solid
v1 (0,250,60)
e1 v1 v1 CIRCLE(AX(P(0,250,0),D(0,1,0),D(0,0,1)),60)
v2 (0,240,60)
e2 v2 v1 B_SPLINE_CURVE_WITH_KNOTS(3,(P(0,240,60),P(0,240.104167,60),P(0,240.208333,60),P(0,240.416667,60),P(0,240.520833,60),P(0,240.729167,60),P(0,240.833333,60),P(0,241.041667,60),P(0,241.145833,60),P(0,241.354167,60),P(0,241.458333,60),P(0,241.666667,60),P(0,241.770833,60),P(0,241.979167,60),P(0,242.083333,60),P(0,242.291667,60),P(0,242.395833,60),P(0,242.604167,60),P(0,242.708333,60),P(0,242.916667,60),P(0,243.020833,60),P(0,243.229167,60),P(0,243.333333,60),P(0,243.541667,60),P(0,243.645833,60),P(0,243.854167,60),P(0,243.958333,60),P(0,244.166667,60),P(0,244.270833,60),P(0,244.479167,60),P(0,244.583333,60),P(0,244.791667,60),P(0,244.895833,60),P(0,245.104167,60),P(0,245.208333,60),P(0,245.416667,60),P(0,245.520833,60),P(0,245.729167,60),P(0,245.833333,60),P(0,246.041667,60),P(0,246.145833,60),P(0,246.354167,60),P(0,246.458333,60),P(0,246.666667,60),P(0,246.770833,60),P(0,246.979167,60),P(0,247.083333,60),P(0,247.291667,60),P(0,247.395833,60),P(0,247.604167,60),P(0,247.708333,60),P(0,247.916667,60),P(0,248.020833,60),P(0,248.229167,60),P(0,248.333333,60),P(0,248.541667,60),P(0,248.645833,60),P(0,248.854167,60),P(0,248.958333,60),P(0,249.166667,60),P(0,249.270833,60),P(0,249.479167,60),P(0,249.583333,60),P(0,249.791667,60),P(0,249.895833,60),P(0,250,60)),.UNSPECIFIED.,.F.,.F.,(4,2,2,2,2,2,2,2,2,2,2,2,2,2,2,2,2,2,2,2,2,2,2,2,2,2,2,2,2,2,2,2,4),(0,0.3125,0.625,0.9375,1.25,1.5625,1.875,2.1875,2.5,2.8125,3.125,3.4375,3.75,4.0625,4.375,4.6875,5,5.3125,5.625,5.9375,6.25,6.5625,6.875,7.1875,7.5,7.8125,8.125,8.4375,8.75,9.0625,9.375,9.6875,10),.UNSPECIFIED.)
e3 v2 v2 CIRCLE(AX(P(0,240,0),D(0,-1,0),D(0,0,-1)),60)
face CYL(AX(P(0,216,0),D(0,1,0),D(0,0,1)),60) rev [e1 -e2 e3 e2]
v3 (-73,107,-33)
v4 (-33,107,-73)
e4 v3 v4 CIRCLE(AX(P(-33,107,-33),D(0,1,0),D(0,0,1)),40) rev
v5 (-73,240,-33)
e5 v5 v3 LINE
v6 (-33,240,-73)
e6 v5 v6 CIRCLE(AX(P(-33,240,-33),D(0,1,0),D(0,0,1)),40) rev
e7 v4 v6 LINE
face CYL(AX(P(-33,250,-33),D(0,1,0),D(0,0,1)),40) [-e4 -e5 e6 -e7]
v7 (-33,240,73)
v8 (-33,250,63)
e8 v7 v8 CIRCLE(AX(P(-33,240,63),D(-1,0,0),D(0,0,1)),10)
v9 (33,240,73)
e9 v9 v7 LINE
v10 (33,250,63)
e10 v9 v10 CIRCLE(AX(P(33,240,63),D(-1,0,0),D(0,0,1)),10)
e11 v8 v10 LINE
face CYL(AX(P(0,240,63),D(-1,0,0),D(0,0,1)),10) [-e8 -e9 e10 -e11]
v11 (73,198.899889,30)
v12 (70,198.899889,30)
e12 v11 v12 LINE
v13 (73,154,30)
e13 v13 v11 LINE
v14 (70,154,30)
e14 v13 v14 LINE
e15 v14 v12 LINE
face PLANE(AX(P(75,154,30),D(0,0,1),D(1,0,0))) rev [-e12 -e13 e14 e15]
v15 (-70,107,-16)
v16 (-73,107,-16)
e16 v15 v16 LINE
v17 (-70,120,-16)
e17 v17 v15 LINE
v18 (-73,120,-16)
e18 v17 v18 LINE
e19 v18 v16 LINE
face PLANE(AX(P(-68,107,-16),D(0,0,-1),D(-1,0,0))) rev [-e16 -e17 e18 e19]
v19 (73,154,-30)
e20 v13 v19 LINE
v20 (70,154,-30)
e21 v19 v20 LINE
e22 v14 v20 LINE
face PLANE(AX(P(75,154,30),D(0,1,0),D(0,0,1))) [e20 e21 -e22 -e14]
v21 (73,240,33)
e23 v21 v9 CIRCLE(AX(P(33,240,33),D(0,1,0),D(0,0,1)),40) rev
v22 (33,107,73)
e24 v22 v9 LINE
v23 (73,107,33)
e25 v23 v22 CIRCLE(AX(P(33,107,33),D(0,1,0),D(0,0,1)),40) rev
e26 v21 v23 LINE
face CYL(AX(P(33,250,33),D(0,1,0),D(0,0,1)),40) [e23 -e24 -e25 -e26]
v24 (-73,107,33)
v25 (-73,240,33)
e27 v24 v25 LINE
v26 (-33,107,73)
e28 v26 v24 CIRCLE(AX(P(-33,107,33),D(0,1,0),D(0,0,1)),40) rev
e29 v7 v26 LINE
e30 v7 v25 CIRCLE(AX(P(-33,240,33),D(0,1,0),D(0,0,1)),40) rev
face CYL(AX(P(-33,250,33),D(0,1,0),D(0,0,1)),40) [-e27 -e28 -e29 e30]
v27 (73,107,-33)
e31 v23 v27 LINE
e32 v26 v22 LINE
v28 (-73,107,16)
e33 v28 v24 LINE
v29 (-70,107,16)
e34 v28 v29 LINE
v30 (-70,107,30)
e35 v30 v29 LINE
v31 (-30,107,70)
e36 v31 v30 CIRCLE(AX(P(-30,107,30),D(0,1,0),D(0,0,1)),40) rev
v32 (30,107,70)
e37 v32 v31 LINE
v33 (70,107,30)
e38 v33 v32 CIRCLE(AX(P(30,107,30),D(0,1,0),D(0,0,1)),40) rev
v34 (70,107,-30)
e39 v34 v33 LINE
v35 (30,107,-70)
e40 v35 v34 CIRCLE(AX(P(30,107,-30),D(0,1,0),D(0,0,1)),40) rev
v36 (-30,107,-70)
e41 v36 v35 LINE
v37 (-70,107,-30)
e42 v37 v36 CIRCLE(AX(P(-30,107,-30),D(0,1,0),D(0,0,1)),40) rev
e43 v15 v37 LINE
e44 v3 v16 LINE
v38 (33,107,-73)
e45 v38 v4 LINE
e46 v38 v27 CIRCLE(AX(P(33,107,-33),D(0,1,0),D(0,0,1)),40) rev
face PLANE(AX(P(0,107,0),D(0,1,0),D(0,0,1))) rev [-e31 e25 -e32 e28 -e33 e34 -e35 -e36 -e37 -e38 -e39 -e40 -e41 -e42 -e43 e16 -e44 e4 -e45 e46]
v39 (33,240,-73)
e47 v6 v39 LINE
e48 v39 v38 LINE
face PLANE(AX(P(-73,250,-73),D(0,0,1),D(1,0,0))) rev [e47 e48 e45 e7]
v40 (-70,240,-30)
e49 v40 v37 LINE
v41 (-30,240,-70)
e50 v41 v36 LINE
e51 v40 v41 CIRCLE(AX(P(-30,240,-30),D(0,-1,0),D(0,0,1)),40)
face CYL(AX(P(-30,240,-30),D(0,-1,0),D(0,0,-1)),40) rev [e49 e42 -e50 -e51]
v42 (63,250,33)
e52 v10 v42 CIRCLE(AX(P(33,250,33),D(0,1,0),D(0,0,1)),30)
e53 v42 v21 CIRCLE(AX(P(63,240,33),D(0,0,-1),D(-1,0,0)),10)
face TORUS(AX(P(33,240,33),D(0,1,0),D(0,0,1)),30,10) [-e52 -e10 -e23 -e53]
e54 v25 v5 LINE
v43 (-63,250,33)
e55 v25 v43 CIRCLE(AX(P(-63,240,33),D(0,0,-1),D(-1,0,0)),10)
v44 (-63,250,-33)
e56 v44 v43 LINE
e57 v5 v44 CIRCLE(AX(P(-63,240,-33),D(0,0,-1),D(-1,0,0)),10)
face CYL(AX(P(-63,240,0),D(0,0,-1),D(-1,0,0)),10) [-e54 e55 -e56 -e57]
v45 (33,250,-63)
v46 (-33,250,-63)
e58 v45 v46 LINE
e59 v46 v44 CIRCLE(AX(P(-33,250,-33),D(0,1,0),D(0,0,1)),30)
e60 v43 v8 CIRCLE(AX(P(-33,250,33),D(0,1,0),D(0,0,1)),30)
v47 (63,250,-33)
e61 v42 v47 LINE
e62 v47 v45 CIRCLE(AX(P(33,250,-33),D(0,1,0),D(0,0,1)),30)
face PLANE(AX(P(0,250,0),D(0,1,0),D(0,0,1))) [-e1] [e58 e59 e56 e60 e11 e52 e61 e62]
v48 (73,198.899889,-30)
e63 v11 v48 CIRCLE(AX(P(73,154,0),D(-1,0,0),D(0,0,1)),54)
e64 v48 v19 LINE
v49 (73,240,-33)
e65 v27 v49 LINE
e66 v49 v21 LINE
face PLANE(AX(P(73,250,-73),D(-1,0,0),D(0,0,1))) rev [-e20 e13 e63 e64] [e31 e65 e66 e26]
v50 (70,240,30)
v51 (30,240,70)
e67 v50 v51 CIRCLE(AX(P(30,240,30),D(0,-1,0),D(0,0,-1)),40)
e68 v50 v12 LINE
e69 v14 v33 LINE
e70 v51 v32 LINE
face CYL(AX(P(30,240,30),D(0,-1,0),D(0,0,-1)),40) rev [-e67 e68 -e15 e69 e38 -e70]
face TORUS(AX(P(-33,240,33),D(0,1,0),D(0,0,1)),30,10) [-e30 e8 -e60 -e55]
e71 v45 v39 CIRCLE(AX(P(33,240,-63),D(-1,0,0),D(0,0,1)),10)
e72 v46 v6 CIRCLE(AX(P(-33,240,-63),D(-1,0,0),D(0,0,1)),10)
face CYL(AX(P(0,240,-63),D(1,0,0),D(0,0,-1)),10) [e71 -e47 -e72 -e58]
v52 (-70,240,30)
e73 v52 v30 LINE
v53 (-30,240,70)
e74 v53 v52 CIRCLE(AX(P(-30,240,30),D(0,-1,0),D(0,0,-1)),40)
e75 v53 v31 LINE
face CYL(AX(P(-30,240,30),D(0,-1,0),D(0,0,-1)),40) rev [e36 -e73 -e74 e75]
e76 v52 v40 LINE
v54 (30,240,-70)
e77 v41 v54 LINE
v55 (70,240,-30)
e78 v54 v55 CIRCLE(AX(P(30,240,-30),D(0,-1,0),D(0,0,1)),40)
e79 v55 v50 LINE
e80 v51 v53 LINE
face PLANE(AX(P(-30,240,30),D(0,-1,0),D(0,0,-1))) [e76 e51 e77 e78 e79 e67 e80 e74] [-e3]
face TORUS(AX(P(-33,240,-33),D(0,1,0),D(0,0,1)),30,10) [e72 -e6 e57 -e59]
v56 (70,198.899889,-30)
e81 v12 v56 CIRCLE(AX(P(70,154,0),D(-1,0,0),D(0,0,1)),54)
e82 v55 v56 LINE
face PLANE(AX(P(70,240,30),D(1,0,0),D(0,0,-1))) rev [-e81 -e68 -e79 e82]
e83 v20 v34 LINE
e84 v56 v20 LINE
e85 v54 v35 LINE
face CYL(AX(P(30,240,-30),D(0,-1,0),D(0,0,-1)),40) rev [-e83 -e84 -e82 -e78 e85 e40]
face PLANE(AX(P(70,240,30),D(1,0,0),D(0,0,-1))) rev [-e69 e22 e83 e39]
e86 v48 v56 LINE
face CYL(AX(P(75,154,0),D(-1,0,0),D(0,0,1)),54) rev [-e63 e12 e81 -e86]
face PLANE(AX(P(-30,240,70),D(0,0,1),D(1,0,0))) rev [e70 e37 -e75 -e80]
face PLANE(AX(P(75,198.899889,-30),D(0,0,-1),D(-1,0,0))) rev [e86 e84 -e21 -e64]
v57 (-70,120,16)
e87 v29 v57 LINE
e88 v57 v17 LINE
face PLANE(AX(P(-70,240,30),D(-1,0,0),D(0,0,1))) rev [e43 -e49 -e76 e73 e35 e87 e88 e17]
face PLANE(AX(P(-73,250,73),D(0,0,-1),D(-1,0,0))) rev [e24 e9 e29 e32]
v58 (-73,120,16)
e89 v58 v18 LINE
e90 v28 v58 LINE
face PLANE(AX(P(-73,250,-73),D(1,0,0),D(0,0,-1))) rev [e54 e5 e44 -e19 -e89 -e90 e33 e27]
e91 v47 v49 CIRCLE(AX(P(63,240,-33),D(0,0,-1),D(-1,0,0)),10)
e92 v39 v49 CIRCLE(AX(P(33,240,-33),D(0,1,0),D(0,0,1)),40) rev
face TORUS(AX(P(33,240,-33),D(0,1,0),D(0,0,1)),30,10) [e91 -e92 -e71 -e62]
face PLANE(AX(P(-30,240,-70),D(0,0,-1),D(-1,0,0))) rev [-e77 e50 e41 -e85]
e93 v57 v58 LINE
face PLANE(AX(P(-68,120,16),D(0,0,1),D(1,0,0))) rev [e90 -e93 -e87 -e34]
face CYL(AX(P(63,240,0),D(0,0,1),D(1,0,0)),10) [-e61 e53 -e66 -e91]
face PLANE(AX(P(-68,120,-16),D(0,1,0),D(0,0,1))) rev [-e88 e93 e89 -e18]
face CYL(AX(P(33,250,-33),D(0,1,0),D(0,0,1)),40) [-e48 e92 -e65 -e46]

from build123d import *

# Parameters (mm, degrees)
SKETCH5_W           = 146
SKETCH5_H           = 146
BOSS_EXTRUDE2_DEPTH = 250
FILLET8_R           = 40
FILLET9_R           = 40
FILLET10_R          = 40
FILLET11_R          = 40
FILLET12_R          = 10
BOSS_EXTRUDE5_START = -240
BOSS_EXTRUDE5_DEPTH = 240
SKETCH8_R           = 60
CUT_EXTRUDE1_DEPTH  = 34
SKETCH10_W          = 44
SKETCH10_H          = 33
CUT_EXTRUDE2_DEPTH  = 3
CUT_EXTRUDE3_DEPTH  = 3
SKETCH12_W          = 157.188162186
SKETCH12_H          = 158.114359626
CUT_EXTRUDE4_DEPTH  = 107
SKETCH15_W          = 32
SKETCH15_H          = 13
CUT_EXTRUDE7_DEPTH  = 5
CUT_EXTRUDE9_DEPTH  = 5


# Read off the part's stored shape, not the designer's step: Boss-Extrude5
with BuildPart() as part:
    # Sketch5 → Boss-Extrude2 (new body)
    with BuildSketch(Plane(origin=(0, 0, 0), x_dir=(1, 0, 0), z_dir=(0, 1, 0))):
        Rectangle(SKETCH5_W, SKETCH5_H)
    extrude(amount=BOSS_EXTRUDE2_DEPTH)

    # Fillet8
    fillet8_edges = [part.edges().sort_by_distance(p)[0] for p in [
        (73, 125, 73),
    ]]
    fillet(fillet8_edges, radius=FILLET8_R)

    # Fillet9
    fillet9_edges = [part.edges().sort_by_distance(p)[0] for p in [
        (73, 125, -73),
    ]]
    fillet(fillet9_edges, radius=FILLET9_R)

    # Fillet10
    fillet10_edges = [part.edges().sort_by_distance(p)[0] for p in [
        (-73, 125, -73),
    ]]
    fillet(fillet10_edges, radius=FILLET10_R)

    # Fillet11
    fillet11_edges = [part.edges().sort_by_distance(p)[0] for p in [
        (-73, 125, 73),
    ]]
    fillet(fillet11_edges, radius=FILLET11_R)

    # Fillet12
    fillet12_edges = [part.edges().sort_by_distance(p)[0] for p in [
        (73, 250, 0),
        (61.284271247, 250, 61.284271247),
        (0, 250, -73),
        (61.284271247, 250, -61.284271247),
        (-73, 250, 0),
        (-61.284271247, 250, -61.284271247),
        (0, 250, 73),
        (-61.284271247, 250, 61.284271247),
    ]]
    fillet(fillet12_edges, radius=FILLET12_R)

    # Boss-Extrude5 outline → Boss-Extrude5 (cut)
    with BuildSketch(Plane.XZ.offset(BOSS_EXTRUDE5_START)):
        with BuildLine():
            Line((30, 70), (-30, 70))
            ThreePointArc((-30, 70), (-58.284271247, 58.284271247), (-70, 30))
            Line((-70, 30), (-70, -30))
            ThreePointArc((-70, -30), (-58.284271247, -58.284271247), (-30, -70))
            Line((-30, -70), (30, -70))
            ThreePointArc((30, -70), (58.284271247, -58.284271247), (70, -30))
            Line((70, -30), (70, 30))
            ThreePointArc((70, 30), (58.284271247, 58.284271247), (30, 70))
        make_face()
    extrude(amount=BOSS_EXTRUDE5_DEPTH, mode=Mode.SUBTRACT)

    # Sketch8 → Cut-Extrude1 (cut)
    with BuildSketch(Plane(origin=(0, 250, 0), x_dir=(1, 0, 0), z_dir=(0, 1, 0))):
        with Locations(Location((0, 0, 0), (0, 0, 270))):
            Circle(SKETCH8_R)
    extrude(amount=-CUT_EXTRUDE1_DEPTH, mode=Mode.SUBTRACT)

    # Sketch10 → Cut-Extrude2 (cut)
    with BuildSketch(Plane(origin=(73, 0, 0), x_dir=(0, 0, -1), z_dir=(1, 0, 0))):
        with Locations((0, 63.5)):
            Rectangle(SKETCH10_W, SKETCH10_H)
    extrude(amount=-CUT_EXTRUDE2_DEPTH, mode=Mode.SUBTRACT)

    # Sketch11 → Cut-Extrude3 (cut)
    with BuildSketch(Plane.ZY.offset(73)):
        Polygon((0, 0), (-16, 0), (-16, 13), (16, 13), (16, 0), align=None)
    extrude(amount=-CUT_EXTRUDE3_DEPTH, mode=Mode.SUBTRACT)

    # Sketch12 → Cut-Extrude4 (cut)
    with BuildSketch(Plane.XZ):
        with Locations((-1.675039252, -2.437620076)):
            Rectangle(SKETCH12_W, SKETCH12_H)
    extrude(amount=-CUT_EXTRUDE4_DEPTH, mode=Mode.SUBTRACT)

    # Sketch15 → Cut-Extrude7 (cut)
    with BuildSketch(Plane.ZY.offset(73)):
        with Locations((0, 113.5)):
            Rectangle(SKETCH15_W, SKETCH15_H)
    extrude(amount=-CUT_EXTRUDE7_DEPTH, mode=Mode.SUBTRACT)

    # Sketch17 → Cut-Extrude9 (cut)
    with BuildSketch(Plane.ZY.offset(-70)):
        with BuildLine():
            Line((30, 154), (-30, 154))
            Line((-30, 154), (-30, 198.899888641))
            ThreePointArc((-30, 198.899888641), (0, 208), (30, 198.899888641))
            Line((30, 198.899888641), (30, 154))
        make_face()
    extrude(amount=-CUT_EXTRUDE9_DEPTH, mode=Mode.SUBTRACT)


solid = part.part
